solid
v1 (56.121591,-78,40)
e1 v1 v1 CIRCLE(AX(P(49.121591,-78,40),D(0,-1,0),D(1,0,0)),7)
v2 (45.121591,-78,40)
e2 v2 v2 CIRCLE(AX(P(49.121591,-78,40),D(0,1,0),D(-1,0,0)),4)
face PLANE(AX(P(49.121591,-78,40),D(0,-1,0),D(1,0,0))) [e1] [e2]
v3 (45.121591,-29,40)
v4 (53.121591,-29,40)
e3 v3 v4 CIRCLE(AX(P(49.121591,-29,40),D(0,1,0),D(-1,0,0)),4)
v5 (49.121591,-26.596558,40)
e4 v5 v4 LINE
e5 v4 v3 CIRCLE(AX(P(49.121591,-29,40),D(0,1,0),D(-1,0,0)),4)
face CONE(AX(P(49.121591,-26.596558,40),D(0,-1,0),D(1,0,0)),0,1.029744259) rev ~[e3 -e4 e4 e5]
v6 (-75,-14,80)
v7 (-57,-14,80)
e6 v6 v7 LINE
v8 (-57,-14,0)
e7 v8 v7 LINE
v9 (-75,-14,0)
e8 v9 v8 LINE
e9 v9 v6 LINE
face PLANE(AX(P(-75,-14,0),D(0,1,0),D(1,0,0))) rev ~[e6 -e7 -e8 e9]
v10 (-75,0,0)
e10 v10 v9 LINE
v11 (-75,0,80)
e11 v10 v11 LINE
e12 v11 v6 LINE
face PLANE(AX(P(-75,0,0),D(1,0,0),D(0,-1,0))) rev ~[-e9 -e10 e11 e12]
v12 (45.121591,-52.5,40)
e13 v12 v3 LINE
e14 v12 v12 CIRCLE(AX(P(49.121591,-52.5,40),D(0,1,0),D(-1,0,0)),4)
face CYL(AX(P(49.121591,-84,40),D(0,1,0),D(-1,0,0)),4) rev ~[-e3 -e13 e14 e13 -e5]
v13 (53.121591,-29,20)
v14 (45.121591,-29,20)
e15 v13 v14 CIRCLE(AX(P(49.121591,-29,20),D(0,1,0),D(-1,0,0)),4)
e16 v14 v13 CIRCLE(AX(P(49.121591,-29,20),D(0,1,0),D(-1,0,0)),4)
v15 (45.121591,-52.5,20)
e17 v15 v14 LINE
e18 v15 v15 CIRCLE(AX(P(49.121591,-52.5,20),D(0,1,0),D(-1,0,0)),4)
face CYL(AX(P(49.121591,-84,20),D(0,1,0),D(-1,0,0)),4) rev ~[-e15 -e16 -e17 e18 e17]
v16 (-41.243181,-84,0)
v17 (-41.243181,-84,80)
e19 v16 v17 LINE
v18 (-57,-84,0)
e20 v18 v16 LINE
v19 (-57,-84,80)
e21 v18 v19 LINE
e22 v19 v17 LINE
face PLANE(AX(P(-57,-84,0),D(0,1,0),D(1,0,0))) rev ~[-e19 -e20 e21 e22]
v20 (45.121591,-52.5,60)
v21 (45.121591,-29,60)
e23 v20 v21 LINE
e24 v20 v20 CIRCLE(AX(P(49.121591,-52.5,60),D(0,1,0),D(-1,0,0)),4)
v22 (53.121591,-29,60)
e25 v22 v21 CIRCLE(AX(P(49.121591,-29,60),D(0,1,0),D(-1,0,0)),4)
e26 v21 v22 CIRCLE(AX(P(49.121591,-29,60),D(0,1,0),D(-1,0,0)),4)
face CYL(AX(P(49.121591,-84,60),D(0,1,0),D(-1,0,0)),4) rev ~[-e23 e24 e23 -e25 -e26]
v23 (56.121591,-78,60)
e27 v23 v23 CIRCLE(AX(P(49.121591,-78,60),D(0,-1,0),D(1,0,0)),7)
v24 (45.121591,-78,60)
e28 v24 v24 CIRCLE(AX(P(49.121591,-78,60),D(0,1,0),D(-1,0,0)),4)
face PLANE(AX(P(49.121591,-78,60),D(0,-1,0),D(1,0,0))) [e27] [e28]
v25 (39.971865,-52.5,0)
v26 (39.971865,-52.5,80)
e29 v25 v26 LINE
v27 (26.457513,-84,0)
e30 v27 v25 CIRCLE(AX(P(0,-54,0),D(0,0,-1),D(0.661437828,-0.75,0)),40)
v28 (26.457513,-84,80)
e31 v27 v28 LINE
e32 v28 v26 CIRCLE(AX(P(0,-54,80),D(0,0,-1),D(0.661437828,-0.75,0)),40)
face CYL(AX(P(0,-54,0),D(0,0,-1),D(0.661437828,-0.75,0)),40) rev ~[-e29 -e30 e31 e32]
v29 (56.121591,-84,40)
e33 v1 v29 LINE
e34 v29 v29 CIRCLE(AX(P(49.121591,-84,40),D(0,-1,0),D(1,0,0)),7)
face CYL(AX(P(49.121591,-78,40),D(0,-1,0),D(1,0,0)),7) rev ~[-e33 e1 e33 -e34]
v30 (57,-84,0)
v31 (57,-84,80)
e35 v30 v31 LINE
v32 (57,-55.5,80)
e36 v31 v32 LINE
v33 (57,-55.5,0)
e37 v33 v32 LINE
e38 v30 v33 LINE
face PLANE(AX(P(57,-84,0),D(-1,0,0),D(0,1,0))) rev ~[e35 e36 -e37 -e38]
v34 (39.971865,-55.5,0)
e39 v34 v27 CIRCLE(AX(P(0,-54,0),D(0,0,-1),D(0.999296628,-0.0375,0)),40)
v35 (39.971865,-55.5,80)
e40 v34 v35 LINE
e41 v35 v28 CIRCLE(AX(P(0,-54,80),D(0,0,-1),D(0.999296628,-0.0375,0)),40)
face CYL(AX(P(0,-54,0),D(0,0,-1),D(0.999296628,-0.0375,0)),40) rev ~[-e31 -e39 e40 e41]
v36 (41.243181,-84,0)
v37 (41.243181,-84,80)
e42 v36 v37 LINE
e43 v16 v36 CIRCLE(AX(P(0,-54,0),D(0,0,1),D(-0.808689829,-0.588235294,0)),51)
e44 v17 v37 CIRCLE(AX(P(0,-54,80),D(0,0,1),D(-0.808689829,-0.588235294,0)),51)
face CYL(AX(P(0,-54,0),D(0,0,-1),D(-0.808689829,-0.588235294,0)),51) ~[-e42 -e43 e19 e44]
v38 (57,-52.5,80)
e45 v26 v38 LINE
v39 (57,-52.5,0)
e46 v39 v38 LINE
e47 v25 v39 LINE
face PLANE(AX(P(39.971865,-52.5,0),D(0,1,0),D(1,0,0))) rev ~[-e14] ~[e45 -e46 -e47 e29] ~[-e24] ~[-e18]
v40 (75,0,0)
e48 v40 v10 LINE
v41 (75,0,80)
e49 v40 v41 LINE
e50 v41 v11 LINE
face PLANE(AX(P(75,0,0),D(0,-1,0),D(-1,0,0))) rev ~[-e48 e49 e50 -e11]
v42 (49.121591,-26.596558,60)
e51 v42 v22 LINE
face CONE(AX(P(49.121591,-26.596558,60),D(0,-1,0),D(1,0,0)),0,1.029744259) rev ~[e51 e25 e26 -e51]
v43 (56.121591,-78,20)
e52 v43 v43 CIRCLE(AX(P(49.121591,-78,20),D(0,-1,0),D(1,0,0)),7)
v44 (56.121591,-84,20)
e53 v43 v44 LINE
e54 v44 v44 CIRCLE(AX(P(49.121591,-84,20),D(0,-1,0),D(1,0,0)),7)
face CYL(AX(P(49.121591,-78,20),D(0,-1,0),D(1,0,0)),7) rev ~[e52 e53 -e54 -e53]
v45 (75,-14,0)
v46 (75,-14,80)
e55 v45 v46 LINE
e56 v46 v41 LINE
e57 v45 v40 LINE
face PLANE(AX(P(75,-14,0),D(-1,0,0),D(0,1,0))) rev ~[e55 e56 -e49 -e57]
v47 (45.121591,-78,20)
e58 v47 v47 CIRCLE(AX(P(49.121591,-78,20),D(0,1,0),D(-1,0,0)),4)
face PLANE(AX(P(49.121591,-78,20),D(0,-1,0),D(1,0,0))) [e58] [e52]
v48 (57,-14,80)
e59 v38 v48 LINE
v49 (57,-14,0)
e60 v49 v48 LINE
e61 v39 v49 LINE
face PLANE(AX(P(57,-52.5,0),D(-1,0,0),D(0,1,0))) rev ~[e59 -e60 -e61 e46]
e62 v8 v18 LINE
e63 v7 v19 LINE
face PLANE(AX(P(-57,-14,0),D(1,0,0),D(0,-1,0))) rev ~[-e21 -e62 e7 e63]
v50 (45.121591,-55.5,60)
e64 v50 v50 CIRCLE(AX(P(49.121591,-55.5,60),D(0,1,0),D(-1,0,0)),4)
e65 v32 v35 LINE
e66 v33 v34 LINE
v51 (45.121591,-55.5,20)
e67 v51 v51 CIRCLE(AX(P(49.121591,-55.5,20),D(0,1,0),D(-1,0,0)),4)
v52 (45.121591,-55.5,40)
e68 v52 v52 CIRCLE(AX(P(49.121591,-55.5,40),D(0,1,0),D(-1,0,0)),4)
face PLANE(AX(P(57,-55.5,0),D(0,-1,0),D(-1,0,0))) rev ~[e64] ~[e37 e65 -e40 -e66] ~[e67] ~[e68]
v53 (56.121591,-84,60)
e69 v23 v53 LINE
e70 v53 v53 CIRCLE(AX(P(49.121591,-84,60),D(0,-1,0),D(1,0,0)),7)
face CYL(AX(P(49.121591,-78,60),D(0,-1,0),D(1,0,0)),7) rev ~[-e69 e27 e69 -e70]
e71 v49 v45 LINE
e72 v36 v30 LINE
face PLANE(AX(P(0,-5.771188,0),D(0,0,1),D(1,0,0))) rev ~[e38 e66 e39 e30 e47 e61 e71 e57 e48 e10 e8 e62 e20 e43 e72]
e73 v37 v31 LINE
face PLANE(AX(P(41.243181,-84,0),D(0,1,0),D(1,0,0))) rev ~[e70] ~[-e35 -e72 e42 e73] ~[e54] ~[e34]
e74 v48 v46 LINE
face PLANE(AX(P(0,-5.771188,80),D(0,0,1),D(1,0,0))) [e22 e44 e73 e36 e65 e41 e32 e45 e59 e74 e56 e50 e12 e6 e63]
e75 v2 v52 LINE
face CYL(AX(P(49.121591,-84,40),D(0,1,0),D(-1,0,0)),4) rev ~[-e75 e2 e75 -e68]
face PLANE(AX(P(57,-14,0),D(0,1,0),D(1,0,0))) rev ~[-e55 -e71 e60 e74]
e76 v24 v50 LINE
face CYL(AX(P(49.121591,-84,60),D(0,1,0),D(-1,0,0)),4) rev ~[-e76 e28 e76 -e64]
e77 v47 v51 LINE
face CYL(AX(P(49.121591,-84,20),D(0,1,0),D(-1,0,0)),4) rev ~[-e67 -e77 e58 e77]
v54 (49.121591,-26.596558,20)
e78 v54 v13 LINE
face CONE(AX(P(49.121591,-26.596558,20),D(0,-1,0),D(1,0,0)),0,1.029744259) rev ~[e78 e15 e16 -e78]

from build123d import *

# Parameters (mm, degrees)
F1_DEPTH       = 80
F3_D           = 8
F3_DEPTH       = 55
F3_CBORE_D     = 14
F3_CBORE_DEPTH = 6
F3_TIP         = 2.4034424761


# Not quite as in the source:
# - a feature of the source that left no trace in its solid (it failed there, or was rolled back) is left out


with BuildPart() as f1:
    # F0 (on Top) → F1 (new body)
    with BuildSketch(Plane.XY):
        with BuildLine():
            ThreePointArc((-31.6385840391, -14), (0, -3), (31.6385840391, -14))
            Line((31.6385840391, -14), (57, -14))
            Line((57, -14), (75, -14))
            Line((75, -14), (75, 0))
            Line((75, 0), (-75, 0))
            Line((-75, 0), (-75, -14))
            Line((-75, -14), (-57, -14))
            Line((-57, -14), (-31.6385840391, -14))
        make_face()
        with BuildLine():
            ThreePointArc((-41.2431812546, -84), (-50.5266061405, -47.0673185622), (-31.6385840391, -14))
            Line((-31.6385840391, -14), (-57, -14))
            Line((-57, -14), (-57, -84))
            Line((-57, -84), (-41.2431812546, -84))
        make_face()
        with BuildLine():
            ThreePointArc((0, -14), (27.748873851, -25.1902794182), (39.9718651053, -52.5))
            Line((39.9718651053, -52.5), (50.9779364039, -52.5))
            ThreePointArc((50.9779364039, -52.5), (45.5734008225, -31.1075309878), (31.6385840391, -14))
            Line((31.6385840391, -14), (0, -14))
        make_face()
        with BuildLine():
            ThreePointArc((-26.4575131106, -84), (-37.4165738677, -39.8578643763), (0, -14))
            Line((0, -14), (-31.6385840391, -14))
            ThreePointArc((-31.6385840391, -14), (-50.5266061405, -47.0673185622), (-41.2431812546, -84))
            Line((-41.2431812546, -84), (-26.4575131106, -84))
        make_face()
        with BuildLine():
            Line((57, -55.5), (50.9779364039, -55.5))
            ThreePointArc((50.9779364039, -55.5), (48.2622640947, -70.4849587338), (41.2431812546, -84))
            Line((41.2431812546, -84), (57, -84))
            Line((57, -84), (57, -55.5))
        make_face()
        with BuildLine():
            ThreePointArc((31.6385840391, -14), (45.5734008225, -31.1075309878), (50.9779364039, -52.5))
            Line((50.9779364039, -52.5), (57, -52.5))
            Line((57, -52.5), (57, -14))
            Line((57, -14), (31.6385840391, -14))
        make_face()
        with BuildLine():
            Line((41.2431812546, -84), (26.4575131106, -84))
            ThreePointArc((26.4575131106, -84), (0, -94), (-26.4575131106, -84))
            Line((-26.4575131106, -84), (-41.2431812546, -84))
            ThreePointArc((-41.2431812546, -84), (0, -105), (41.2431812546, -84))
        make_face()
        with BuildLine():
            Line((50.9779364039, -55.5), (39.9718651053, -55.5))
            ThreePointArc((39.9718651053, -55.5), (36.1424690986, -71.1383175213), (26.4575131106, -84))
            Line((26.4575131106, -84), (41.2431812546, -84))
            ThreePointArc((41.2431812546, -84), (48.2622640947, -70.4849587338), (50.9779364039, -55.5))
        make_face()
        with BuildLine():
            Line((-31.6385840391, -14), (0, -14))
            Line((0, -14), (31.6385840391, -14))
            ThreePointArc((31.6385840391, -14), (0, -3), (-31.6385840391, -14))
        make_face()
    extrude(amount=F1_DEPTH)

    # F3
    with Locations(Plane.XZ.offset(84)):
        with Locations((49.1215906273, 20), (49.1215906273, 40), (49.1215906273, 60)):
            CounterBoreHole(F3_D / 2, F3_CBORE_D / 2, F3_CBORE_DEPTH, depth=F3_DEPTH)
            with Locations((0, 0, -(F3_DEPTH + F3_TIP / 2))):  # 118° drill point
                Cone(0, F3_D / 2, F3_TIP, mode=Mode.SUBTRACT)


solid = f1.part
